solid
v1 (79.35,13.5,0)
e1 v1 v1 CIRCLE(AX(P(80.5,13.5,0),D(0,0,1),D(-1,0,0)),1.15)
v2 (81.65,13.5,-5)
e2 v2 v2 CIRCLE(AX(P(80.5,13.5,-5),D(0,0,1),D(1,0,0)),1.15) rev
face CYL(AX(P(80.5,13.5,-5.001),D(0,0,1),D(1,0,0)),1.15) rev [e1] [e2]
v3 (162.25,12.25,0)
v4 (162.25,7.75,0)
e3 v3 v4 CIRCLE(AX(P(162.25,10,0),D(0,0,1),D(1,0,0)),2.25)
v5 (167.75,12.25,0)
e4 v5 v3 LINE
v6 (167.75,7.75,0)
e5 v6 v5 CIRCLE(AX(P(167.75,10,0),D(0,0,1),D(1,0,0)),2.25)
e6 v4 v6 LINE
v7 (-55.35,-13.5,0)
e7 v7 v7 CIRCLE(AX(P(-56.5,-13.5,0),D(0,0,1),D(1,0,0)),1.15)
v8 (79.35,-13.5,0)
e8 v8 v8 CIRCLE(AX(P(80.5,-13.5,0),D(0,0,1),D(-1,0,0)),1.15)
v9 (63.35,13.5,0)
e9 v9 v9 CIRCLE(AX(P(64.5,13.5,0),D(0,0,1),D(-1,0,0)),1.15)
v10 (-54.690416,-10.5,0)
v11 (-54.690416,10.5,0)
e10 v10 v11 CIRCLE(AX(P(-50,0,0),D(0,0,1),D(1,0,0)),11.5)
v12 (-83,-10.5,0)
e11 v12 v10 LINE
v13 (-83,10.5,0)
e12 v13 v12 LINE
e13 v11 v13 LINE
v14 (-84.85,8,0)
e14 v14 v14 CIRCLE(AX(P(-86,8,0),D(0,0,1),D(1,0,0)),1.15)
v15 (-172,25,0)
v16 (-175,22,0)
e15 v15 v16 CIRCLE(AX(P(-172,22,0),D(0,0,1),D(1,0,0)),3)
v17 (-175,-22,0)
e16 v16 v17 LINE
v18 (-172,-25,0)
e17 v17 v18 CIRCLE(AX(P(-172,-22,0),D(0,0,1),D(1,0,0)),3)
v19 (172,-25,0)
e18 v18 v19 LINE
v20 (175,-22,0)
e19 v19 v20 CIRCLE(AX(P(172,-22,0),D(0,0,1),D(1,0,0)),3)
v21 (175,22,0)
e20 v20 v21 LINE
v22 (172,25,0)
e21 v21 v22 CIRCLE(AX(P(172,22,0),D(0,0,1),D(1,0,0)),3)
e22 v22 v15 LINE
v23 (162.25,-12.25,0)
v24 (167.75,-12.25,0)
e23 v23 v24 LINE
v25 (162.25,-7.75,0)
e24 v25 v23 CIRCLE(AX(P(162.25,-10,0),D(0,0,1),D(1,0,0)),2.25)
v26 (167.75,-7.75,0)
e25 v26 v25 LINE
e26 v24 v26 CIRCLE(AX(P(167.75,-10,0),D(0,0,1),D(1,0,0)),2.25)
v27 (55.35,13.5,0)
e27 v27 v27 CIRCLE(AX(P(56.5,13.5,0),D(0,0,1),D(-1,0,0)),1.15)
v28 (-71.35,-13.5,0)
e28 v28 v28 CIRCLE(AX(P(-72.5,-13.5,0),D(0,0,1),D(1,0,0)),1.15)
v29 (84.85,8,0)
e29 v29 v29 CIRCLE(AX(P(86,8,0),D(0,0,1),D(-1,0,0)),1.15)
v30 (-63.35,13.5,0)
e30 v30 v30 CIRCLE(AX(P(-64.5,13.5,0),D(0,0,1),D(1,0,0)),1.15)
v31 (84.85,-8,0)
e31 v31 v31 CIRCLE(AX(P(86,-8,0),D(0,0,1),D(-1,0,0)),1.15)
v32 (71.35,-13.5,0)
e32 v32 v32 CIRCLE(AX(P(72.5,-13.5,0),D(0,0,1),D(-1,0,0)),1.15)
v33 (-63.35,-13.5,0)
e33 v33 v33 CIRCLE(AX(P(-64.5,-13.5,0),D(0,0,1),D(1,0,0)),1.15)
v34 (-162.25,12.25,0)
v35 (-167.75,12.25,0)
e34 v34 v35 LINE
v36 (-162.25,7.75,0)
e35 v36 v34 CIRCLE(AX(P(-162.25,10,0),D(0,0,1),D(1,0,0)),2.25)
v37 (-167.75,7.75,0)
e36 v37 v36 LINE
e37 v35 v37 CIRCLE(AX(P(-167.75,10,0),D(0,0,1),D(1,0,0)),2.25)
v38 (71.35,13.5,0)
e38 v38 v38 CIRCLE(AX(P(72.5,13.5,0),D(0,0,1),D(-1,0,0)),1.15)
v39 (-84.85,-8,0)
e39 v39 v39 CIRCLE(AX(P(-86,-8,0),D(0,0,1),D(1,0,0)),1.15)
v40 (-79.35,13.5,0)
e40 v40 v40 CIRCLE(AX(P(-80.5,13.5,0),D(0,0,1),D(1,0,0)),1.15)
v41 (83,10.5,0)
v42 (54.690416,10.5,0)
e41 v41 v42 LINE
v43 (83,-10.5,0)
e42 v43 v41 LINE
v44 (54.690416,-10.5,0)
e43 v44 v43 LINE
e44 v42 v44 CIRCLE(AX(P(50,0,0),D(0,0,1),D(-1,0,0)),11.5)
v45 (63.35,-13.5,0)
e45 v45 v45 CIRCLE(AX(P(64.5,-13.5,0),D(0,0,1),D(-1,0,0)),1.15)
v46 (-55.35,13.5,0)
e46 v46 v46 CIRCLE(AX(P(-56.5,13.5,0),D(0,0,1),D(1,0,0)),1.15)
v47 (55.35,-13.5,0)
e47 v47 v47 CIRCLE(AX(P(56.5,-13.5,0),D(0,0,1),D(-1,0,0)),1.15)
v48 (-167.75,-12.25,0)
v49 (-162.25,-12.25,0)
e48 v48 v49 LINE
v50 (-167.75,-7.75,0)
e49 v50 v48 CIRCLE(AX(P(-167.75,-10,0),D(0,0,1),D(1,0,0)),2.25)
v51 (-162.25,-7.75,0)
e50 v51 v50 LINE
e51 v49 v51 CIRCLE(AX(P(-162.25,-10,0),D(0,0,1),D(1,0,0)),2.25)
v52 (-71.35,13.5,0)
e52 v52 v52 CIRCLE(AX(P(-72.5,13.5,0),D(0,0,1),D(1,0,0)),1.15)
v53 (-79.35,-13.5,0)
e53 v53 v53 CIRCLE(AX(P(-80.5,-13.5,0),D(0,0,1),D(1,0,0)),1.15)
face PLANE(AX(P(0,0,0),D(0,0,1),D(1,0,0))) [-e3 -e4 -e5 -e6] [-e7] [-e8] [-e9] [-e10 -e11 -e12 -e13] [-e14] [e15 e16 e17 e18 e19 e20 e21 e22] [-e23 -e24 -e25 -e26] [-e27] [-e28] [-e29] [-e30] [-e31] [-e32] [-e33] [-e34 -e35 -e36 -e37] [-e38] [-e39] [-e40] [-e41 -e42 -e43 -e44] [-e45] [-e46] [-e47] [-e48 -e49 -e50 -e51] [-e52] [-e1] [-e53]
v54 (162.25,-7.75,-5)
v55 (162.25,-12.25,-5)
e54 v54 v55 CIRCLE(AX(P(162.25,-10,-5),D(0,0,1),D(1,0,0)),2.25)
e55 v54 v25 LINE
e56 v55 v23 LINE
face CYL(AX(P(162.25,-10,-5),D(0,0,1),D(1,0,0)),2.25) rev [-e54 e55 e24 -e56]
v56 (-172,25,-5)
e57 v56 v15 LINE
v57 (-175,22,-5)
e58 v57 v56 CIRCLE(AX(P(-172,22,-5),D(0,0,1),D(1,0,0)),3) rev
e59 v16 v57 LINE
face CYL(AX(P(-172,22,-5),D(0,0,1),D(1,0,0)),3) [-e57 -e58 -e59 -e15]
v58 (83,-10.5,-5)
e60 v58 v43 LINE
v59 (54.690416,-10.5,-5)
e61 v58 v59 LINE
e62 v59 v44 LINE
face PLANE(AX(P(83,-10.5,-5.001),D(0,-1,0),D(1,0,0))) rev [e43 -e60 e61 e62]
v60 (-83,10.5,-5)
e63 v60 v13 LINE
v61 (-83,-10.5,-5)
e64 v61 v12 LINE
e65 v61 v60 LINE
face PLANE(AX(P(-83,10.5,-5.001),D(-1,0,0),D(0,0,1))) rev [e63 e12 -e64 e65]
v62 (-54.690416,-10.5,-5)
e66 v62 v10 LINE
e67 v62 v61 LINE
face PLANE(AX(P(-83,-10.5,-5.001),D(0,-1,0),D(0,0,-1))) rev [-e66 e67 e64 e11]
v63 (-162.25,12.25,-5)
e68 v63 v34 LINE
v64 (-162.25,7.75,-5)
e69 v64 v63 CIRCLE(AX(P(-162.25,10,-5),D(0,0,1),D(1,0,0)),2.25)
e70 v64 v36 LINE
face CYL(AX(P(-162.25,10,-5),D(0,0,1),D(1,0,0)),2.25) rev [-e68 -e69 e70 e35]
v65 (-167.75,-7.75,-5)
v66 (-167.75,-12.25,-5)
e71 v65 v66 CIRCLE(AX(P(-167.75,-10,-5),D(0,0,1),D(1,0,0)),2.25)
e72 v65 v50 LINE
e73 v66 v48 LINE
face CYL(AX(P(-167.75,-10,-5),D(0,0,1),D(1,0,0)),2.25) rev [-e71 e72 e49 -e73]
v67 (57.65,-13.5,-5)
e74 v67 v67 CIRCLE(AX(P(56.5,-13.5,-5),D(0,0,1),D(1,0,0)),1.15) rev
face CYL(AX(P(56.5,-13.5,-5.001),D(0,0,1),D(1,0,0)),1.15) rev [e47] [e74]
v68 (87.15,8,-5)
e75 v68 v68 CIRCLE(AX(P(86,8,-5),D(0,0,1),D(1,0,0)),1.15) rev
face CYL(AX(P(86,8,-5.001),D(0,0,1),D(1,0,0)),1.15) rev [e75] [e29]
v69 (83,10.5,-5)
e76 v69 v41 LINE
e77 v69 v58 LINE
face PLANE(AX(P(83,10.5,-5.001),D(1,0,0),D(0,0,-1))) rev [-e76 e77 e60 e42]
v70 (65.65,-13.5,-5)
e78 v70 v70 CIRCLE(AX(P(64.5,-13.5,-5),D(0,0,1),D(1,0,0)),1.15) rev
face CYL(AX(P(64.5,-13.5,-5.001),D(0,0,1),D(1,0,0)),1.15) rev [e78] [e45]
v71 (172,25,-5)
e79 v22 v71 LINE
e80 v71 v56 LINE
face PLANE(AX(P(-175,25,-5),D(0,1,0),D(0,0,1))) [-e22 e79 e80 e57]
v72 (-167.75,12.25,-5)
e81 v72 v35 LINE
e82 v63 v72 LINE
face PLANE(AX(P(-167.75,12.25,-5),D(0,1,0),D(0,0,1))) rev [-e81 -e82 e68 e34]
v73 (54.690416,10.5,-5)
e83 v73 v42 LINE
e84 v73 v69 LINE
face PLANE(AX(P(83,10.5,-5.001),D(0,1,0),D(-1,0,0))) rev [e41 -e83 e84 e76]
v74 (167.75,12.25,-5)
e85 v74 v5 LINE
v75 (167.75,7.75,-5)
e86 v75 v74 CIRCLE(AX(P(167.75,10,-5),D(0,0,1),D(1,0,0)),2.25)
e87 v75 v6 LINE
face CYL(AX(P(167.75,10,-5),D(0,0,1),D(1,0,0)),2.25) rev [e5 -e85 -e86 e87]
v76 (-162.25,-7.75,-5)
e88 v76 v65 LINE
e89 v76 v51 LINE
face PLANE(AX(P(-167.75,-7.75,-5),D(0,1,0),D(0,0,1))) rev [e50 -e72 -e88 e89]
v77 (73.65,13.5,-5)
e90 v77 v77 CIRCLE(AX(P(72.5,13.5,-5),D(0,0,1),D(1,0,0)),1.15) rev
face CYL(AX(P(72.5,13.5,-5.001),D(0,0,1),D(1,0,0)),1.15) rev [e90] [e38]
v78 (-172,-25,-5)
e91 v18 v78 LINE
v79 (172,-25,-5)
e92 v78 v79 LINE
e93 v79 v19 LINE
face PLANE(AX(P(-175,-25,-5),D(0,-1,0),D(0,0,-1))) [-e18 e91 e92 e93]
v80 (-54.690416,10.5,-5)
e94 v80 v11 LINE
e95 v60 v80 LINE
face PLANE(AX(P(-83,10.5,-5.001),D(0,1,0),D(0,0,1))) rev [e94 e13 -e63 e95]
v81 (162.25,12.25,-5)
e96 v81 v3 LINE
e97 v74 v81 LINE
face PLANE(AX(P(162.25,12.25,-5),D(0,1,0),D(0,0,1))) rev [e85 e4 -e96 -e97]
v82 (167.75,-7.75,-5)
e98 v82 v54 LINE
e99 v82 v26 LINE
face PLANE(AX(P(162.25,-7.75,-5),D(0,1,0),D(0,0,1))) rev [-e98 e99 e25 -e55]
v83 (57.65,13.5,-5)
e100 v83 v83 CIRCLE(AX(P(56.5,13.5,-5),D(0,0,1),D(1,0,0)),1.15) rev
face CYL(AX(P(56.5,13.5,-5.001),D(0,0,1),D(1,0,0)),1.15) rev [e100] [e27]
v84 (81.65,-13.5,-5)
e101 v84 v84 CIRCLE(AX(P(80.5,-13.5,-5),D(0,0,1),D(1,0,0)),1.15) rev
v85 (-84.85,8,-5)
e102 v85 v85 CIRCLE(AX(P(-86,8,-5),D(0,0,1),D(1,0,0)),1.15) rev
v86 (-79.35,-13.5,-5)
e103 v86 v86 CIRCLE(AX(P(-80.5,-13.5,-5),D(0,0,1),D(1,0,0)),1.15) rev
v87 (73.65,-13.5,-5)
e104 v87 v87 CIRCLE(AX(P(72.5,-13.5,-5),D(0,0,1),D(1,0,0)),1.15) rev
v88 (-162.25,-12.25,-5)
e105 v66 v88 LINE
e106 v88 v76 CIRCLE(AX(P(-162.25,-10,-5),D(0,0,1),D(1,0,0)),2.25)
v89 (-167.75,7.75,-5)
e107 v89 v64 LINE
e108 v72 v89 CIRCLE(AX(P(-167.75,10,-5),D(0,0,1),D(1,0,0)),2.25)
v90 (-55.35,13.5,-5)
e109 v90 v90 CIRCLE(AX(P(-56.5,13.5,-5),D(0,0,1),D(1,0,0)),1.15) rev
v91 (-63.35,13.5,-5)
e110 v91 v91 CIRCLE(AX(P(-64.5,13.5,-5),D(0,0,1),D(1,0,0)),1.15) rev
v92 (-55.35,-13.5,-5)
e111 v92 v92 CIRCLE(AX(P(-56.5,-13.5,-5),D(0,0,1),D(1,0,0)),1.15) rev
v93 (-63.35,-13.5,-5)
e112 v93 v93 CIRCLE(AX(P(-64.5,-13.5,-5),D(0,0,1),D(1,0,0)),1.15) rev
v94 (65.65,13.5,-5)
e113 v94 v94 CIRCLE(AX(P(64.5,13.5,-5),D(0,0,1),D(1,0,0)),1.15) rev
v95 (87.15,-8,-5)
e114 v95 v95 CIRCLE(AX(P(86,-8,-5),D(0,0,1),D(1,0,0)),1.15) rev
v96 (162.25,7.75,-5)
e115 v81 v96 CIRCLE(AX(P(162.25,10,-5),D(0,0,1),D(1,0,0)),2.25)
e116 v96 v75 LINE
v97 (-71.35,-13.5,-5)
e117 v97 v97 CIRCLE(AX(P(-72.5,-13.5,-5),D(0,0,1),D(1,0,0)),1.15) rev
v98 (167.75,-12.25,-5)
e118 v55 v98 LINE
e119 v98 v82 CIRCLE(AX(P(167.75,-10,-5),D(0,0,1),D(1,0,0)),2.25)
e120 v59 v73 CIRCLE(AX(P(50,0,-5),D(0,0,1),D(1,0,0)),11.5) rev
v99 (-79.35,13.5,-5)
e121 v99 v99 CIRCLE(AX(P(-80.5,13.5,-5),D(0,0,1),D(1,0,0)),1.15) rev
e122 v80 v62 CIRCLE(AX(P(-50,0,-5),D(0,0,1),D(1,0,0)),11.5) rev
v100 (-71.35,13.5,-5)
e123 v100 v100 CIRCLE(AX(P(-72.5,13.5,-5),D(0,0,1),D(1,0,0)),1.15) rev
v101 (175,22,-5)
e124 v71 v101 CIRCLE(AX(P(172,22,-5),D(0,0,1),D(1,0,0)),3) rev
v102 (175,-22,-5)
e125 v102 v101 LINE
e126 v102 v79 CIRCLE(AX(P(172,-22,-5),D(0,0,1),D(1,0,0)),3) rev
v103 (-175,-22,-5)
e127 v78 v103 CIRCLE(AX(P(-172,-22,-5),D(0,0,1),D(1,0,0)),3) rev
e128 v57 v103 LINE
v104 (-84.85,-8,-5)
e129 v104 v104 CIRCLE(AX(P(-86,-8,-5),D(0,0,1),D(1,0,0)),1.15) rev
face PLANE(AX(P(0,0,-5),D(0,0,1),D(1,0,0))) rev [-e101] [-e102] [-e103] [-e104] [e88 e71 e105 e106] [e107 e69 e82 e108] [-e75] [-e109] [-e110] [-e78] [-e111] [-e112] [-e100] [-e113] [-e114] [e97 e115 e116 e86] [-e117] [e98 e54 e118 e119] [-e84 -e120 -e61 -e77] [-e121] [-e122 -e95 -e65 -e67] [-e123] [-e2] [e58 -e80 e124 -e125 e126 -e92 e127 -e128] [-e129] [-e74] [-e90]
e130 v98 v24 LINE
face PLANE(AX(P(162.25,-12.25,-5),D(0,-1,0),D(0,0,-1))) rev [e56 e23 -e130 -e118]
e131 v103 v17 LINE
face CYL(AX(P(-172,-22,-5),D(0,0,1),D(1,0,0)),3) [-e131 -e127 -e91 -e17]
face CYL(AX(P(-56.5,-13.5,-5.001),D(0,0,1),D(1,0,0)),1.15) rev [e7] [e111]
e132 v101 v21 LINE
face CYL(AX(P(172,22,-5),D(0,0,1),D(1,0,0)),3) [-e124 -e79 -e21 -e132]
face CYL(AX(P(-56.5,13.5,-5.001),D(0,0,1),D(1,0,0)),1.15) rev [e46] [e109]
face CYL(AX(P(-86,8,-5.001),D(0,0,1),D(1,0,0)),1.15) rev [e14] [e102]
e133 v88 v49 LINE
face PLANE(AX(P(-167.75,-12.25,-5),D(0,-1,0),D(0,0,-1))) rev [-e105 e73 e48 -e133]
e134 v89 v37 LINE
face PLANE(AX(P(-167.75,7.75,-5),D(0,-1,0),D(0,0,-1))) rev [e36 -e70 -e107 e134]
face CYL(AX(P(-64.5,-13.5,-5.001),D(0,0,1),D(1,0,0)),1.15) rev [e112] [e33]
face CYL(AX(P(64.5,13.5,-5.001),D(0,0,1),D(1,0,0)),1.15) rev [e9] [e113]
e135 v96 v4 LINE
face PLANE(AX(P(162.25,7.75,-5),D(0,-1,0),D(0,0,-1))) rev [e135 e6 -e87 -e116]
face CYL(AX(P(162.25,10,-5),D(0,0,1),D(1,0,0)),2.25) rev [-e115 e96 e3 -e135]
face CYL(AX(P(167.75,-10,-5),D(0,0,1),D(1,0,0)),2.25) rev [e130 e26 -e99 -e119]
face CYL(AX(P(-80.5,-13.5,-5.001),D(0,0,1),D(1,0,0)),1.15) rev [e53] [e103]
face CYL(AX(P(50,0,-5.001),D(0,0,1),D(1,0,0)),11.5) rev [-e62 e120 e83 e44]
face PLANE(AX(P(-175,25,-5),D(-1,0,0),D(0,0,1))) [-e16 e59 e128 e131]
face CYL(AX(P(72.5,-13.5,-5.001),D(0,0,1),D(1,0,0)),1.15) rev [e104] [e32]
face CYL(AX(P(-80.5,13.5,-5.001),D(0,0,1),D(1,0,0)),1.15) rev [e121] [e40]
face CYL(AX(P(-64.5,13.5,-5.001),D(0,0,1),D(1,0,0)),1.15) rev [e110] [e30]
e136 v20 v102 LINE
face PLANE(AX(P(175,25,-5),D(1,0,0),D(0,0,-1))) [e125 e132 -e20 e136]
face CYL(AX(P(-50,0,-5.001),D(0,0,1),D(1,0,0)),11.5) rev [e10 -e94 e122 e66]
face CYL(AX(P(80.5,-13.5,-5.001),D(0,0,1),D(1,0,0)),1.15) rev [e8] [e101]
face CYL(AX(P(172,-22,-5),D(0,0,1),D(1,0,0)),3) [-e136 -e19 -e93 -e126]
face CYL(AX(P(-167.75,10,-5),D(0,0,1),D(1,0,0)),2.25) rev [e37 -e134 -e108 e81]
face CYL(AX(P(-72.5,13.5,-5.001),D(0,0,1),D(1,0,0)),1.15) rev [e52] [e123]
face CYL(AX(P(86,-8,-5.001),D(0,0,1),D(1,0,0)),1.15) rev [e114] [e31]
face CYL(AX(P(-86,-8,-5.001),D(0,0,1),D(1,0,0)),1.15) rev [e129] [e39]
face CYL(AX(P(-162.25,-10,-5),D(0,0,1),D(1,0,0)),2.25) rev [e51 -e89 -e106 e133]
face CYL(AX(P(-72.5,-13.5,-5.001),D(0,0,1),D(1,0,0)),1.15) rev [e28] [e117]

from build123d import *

# Parameters (mm, degrees)
SKETCH1_W           = 350
SKETCH1_H           = 50
BASE_FLANGE1_DEPTH  = 5
CUT_EXTRUDE1_REACH  = 178.847
SKETCH3_R           = 1.15
BREAK_CORNER2_START = -5
BREAK_CORNER2_DEPTH = 5


# Read off the part's stored shape, not the designer's step: Break-Corner2
# Sheet-metal steps are written as plain solids
with BuildPart() as part:
    # Sketch1 → Base-Flange1 (new body)
    with BuildSketch(Plane.XY):
        Rectangle(SKETCH1_W, SKETCH1_H)
        with BuildLine():
            Line((-167.75, -7.75), (-162.25, -7.75))
            ThreePointArc((-162.25, -7.75), (-160, -10), (-162.25, -12.25))
            Line((-162.25, -12.25), (-167.75, -12.25))
            ThreePointArc((-167.75, -12.25), (-170, -10), (-167.75, -7.75))
        make_face(mode=Mode.SUBTRACT)
        with BuildLine():
            Line((-167.75, 12.25), (-162.25, 12.25))
            ThreePointArc((-162.25, 12.25), (-160, 10), (-162.25, 7.75))
            Line((-162.25, 7.75), (-167.75, 7.75))
            ThreePointArc((-167.75, 7.75), (-170, 10), (-167.75, 12.25))
        make_face(mode=Mode.SUBTRACT)
        with BuildLine():
            Line((162.25, 12.25), (167.75, 12.25))
            ThreePointArc((167.75, 12.25), (170, 10), (167.75, 7.75))
            Line((167.75, 7.75), (162.25, 7.75))
            ThreePointArc((162.25, 7.75), (160, 10), (162.25, 12.25))
        make_face(mode=Mode.SUBTRACT)
        with BuildLine():
            Line((162.25, -7.75), (167.75, -7.75))
            ThreePointArc((167.75, -7.75), (170, -10), (167.75, -12.25))
            Line((167.75, -12.25), (162.25, -12.25))
            ThreePointArc((162.25, -12.25), (160, -10), (162.25, -7.75))
        make_face(mode=Mode.SUBTRACT)
    extrude(amount=-BASE_FLANGE1_DEPTH)

    # Sketch3 → Cut-Extrude1 (cut, up to next)
    with BuildSketch(Plane.XY, mode=Mode.PRIVATE) as cut_extrude1_sk1:
        with Locations((-80.5, 13.5)):
            Circle(SKETCH3_R)
    cut_extrude1_tool1 = extrude(cut_extrude1_sk1.sketch, amount=-CUT_EXTRUDE1_REACH, mode=Mode.PRIVATE) & part.part
    # Sketch3 → Cut-Extrude1 (cut, up to next)
    with BuildSketch(Plane.XY, mode=Mode.PRIVATE) as cut_extrude1_sk2:
        with Locations((-72.5, 13.5)):
            Circle(SKETCH3_R)
    cut_extrude1_tool2 = extrude(cut_extrude1_sk2.sketch, amount=-CUT_EXTRUDE1_REACH, mode=Mode.PRIVATE) & part.part
    # Sketch3 → Cut-Extrude1 (cut, up to next)
    with BuildSketch(Plane.XY, mode=Mode.PRIVATE) as cut_extrude1_sk3:
        with Locations((-64.5, 13.5)):
            Circle(SKETCH3_R)
    cut_extrude1_tool3 = extrude(cut_extrude1_sk3.sketch, amount=-CUT_EXTRUDE1_REACH, mode=Mode.PRIVATE) & part.part
    # Sketch3 → Cut-Extrude1 (cut, up to next)
    with BuildSketch(Plane.XY, mode=Mode.PRIVATE) as cut_extrude1_sk4:
        with Locations((-56.5, 13.5)):
            Circle(SKETCH3_R)
    cut_extrude1_tool4 = extrude(cut_extrude1_sk4.sketch, amount=-CUT_EXTRUDE1_REACH, mode=Mode.PRIVATE) & part.part
    # Sketch3 → Cut-Extrude1 (cut, up to next)
    with BuildSketch(Plane.XY, mode=Mode.PRIVATE) as cut_extrude1_sk5:
        with Locations((-86, -8)):
            Circle(SKETCH3_R)
    cut_extrude1_tool5 = extrude(cut_extrude1_sk5.sketch, amount=-CUT_EXTRUDE1_REACH, mode=Mode.PRIVATE) & part.part
    # Sketch3 → Cut-Extrude1 (cut, up to next)
    with BuildSketch(Plane.XY, mode=Mode.PRIVATE) as cut_extrude1_sk6:
        with Locations((-80.5, -13.5)):
            Circle(SKETCH3_R)
    cut_extrude1_tool6 = extrude(cut_extrude1_sk6.sketch, amount=-CUT_EXTRUDE1_REACH, mode=Mode.PRIVATE) & part.part
    # Sketch3 → Cut-Extrude1 (cut, up to next)
    with BuildSketch(Plane.XY, mode=Mode.PRIVATE) as cut_extrude1_sk7:
        with Locations((-72.5, -13.5)):
            Circle(SKETCH3_R)
    cut_extrude1_tool7 = extrude(cut_extrude1_sk7.sketch, amount=-CUT_EXTRUDE1_REACH, mode=Mode.PRIVATE) & part.part
    # Sketch3 → Cut-Extrude1 (cut, up to next)
    with BuildSketch(Plane.XY, mode=Mode.PRIVATE) as cut_extrude1_sk8:
        with Locations((-64.5, -13.5)):
            Circle(SKETCH3_R)
    cut_extrude1_tool8 = extrude(cut_extrude1_sk8.sketch, amount=-CUT_EXTRUDE1_REACH, mode=Mode.PRIVATE) & part.part
    # Sketch3 → Cut-Extrude1 (cut, up to next)
    with BuildSketch(Plane.XY, mode=Mode.PRIVATE) as cut_extrude1_sk9:
        with Locations((-56.5, -13.5)):
            Circle(SKETCH3_R)
    cut_extrude1_tool9 = extrude(cut_extrude1_sk9.sketch, amount=-CUT_EXTRUDE1_REACH, mode=Mode.PRIVATE) & part.part
    # Sketch3 → Cut-Extrude1 (cut, up to next)
    with BuildSketch(Plane.XY, mode=Mode.PRIVATE) as cut_extrude1_sk10:
        with Locations((-86, 8)):
            Circle(SKETCH3_R)
    cut_extrude1_tool10 = extrude(cut_extrude1_sk10.sketch, amount=-CUT_EXTRUDE1_REACH, mode=Mode.PRIVATE) & part.part
    # Sketch3 → Cut-Extrude1 (cut, up to next)
    with BuildSketch(Plane.XY, mode=Mode.PRIVATE) as cut_extrude1_sk11:
        with Locations((86, -8)):
            Circle(SKETCH3_R)
    cut_extrude1_tool11 = extrude(cut_extrude1_sk11.sketch, amount=-CUT_EXTRUDE1_REACH, mode=Mode.PRIVATE) & part.part
    # Sketch3 → Cut-Extrude1 (cut, up to next)
    with BuildSketch(Plane.XY, mode=Mode.PRIVATE) as cut_extrude1_sk12:
        with Locations((86, 8)):
            Circle(SKETCH3_R)
    cut_extrude1_tool12 = extrude(cut_extrude1_sk12.sketch, amount=-CUT_EXTRUDE1_REACH, mode=Mode.PRIVATE) & part.part
    # Sketch3 → Cut-Extrude1 (cut, up to next)
    with BuildSketch(Plane.XY, mode=Mode.PRIVATE) as cut_extrude1_sk13:
        with Locations((56.5, -13.5)):
            Circle(SKETCH3_R)
    cut_extrude1_tool13 = extrude(cut_extrude1_sk13.sketch, amount=-CUT_EXTRUDE1_REACH, mode=Mode.PRIVATE) & part.part
    # Sketch3 → Cut-Extrude1 (cut, up to next)
    with BuildSketch(Plane.XY, mode=Mode.PRIVATE) as cut_extrude1_sk14:
        with Locations((64.5, -13.5)):
            Circle(SKETCH3_R)
    cut_extrude1_tool14 = extrude(cut_extrude1_sk14.sketch, amount=-CUT_EXTRUDE1_REACH, mode=Mode.PRIVATE) & part.part
    # Sketch3 → Cut-Extrude1 (cut, up to next)
    with BuildSketch(Plane.XY, mode=Mode.PRIVATE) as cut_extrude1_sk15:
        with Locations((72.5, -13.5)):
            Circle(SKETCH3_R)
    cut_extrude1_tool15 = extrude(cut_extrude1_sk15.sketch, amount=-CUT_EXTRUDE1_REACH, mode=Mode.PRIVATE) & part.part
    # Sketch3 → Cut-Extrude1 (cut, up to next)
    with BuildSketch(Plane.XY, mode=Mode.PRIVATE) as cut_extrude1_sk16:
        with Locations((80.5, -13.5)):
            Circle(SKETCH3_R)
    cut_extrude1_tool16 = extrude(cut_extrude1_sk16.sketch, amount=-CUT_EXTRUDE1_REACH, mode=Mode.PRIVATE) & part.part
    # Sketch3 → Cut-Extrude1 (cut, up to next)
    with BuildSketch(Plane.XY, mode=Mode.PRIVATE) as cut_extrude1_sk17:
        with Locations((56.5, 13.5)):
            Circle(SKETCH3_R)
    cut_extrude1_tool17 = extrude(cut_extrude1_sk17.sketch, amount=-CUT_EXTRUDE1_REACH, mode=Mode.PRIVATE) & part.part
    # Sketch3 → Cut-Extrude1 (cut, up to next)
    with BuildSketch(Plane.XY, mode=Mode.PRIVATE) as cut_extrude1_sk18:
        with Locations((64.5, 13.5)):
            Circle(SKETCH3_R)
    cut_extrude1_tool18 = extrude(cut_extrude1_sk18.sketch, amount=-CUT_EXTRUDE1_REACH, mode=Mode.PRIVATE) & part.part
    # Sketch3 → Cut-Extrude1 (cut, up to next)
    with BuildSketch(Plane.XY, mode=Mode.PRIVATE) as cut_extrude1_sk19:
        with Locations((72.5, 13.5)):
            Circle(SKETCH3_R)
    cut_extrude1_tool19 = extrude(cut_extrude1_sk19.sketch, amount=-CUT_EXTRUDE1_REACH, mode=Mode.PRIVATE) & part.part
    # Sketch3 → Cut-Extrude1 (cut, up to next)
    with BuildSketch(Plane.XY, mode=Mode.PRIVATE) as cut_extrude1_sk20:
        with Locations((80.5, 13.5)):
            Circle(SKETCH3_R)
    cut_extrude1_tool20 = extrude(cut_extrude1_sk20.sketch, amount=-CUT_EXTRUDE1_REACH, mode=Mode.PRIVATE) & part.part
    # Sketch3 → Cut-Extrude1 (cut, up to next)
    with BuildSketch(Plane.XY, mode=Mode.PRIVATE) as cut_extrude1_sk21:
        with BuildLine():
            Line((-83, 10.5), (-54.69041576, 10.5))
            ThreePointArc((-54.69041576, 10.5), (-38.5, 0), (-54.69041576, -10.5))
            Line((-54.69041576, -10.5), (-83, -10.5))
            Line((-83, -10.5), (-83, 10.5))
        make_face()
    cut_extrude1_tool21 = extrude(cut_extrude1_sk21.sketch, amount=-CUT_EXTRUDE1_REACH, mode=Mode.PRIVATE) & part.part
    # Sketch3 → Cut-Extrude1 (cut, up to next)
    with BuildSketch(Plane.XY, mode=Mode.PRIVATE) as cut_extrude1_sk22:
        with BuildLine():
            Line((83, -10.5), (54.69041576, -10.5))
            ThreePointArc((54.69041576, -10.5), (38.5, 0), (54.69041576, 10.5))
            Line((54.69041576, 10.5), (83, 10.5))
            Line((83, 10.5), (83, -10.5))
        make_face()
    cut_extrude1_tool22 = extrude(cut_extrude1_sk22.sketch, amount=-CUT_EXTRUDE1_REACH, mode=Mode.PRIVATE) & part.part
    add(cut_extrude1_tool1.solids().sort_by_distance((-80.5, 13.5, 0))[0], mode=Mode.SUBTRACT)
    add(cut_extrude1_tool2.solids().sort_by_distance((-72.5, 13.5, 0))[0], mode=Mode.SUBTRACT)
    add(cut_extrude1_tool3.solids().sort_by_distance((-64.5, 13.5, 0))[0], mode=Mode.SUBTRACT)
    add(cut_extrude1_tool4.solids().sort_by_distance((-56.5, 13.5, 0))[0], mode=Mode.SUBTRACT)
    add(cut_extrude1_tool5.solids().sort_by_distance((-86, -8, 0))[0], mode=Mode.SUBTRACT)
    add(cut_extrude1_tool6.solids().sort_by_distance((-80.5, -13.5, 0))[0], mode=Mode.SUBTRACT)
    add(cut_extrude1_tool7.solids().sort_by_distance((-72.5, -13.5, 0))[0], mode=Mode.SUBTRACT)
    add(cut_extrude1_tool8.solids().sort_by_distance((-64.5, -13.5, 0))[0], mode=Mode.SUBTRACT)
    add(cut_extrude1_tool9.solids().sort_by_distance((-56.5, -13.5, 0))[0], mode=Mode.SUBTRACT)
    add(cut_extrude1_tool10.solids().sort_by_distance((-86, 8, 0))[0], mode=Mode.SUBTRACT)
    add(cut_extrude1_tool11.solids().sort_by_distance((86, -8, 0))[0], mode=Mode.SUBTRACT)
    add(cut_extrude1_tool12.solids().sort_by_distance((86, 8, 0))[0], mode=Mode.SUBTRACT)
    add(cut_extrude1_tool13.solids().sort_by_distance((56.5, -13.5, 0))[0], mode=Mode.SUBTRACT)
    add(cut_extrude1_tool14.solids().sort_by_distance((64.5, -13.5, 0))[0], mode=Mode.SUBTRACT)
    add(cut_extrude1_tool15.solids().sort_by_distance((72.5, -13.5, 0))[0], mode=Mode.SUBTRACT)
    add(cut_extrude1_tool16.solids().sort_by_distance((80.5, -13.5, 0))[0], mode=Mode.SUBTRACT)
    add(cut_extrude1_tool17.solids().sort_by_distance((56.5, 13.5, 0))[0], mode=Mode.SUBTRACT)
    add(cut_extrude1_tool18.solids().sort_by_distance((64.5, 13.5, 0))[0], mode=Mode.SUBTRACT)
    add(cut_extrude1_tool19.solids().sort_by_distance((72.5, 13.5, 0))[0], mode=Mode.SUBTRACT)
    add(cut_extrude1_tool20.solids().sort_by_distance((80.5, 13.5, 0))[0], mode=Mode.SUBTRACT)
    add(cut_extrude1_tool21.solids().sort_by_distance((-61.500767, 0, 0))[0], mode=Mode.SUBTRACT)
    add(cut_extrude1_tool22.solids().sort_by_distance((61.500767, 0, 0))[0], mode=Mode.SUBTRACT)

    # Break-Corner2 outline → Break-Corner2 (cut)
    with BuildSketch(Plane.XY.offset(BREAK_CORNER2_START)):
        with BuildLine():
            ThreePointArc((175, -22), (174.121320344, -24.121320344), (172, -25))
            Line((172, -25), (175, -25))
            Line((175, -25), (175, -22))
        make_face()
        with BuildLine():
            Line((-175, -25), (-172, -25))
            ThreePointArc((-172, -25), (-174.121320344, -24.121320344), (-175, -22))
            Line((-175, -22), (-175, -25))
        make_face()
        with BuildLine():
            ThreePointArc((172, 25), (174.121320344, 24.121320344), (175, 22))
            Line((175, 22), (175, 25))
            Line((175, 25), (172, 25))
        make_face()
        with BuildLine():
            Line((-175, 25), (-175, 22))
            ThreePointArc((-175, 22), (-174.121320344, 24.121320344), (-172, 25))
            Line((-172, 25), (-175, 25))
        make_face()
    extrude(amount=BREAK_CORNER2_DEPTH, mode=Mode.SUBTRACT)


solid = part.part
